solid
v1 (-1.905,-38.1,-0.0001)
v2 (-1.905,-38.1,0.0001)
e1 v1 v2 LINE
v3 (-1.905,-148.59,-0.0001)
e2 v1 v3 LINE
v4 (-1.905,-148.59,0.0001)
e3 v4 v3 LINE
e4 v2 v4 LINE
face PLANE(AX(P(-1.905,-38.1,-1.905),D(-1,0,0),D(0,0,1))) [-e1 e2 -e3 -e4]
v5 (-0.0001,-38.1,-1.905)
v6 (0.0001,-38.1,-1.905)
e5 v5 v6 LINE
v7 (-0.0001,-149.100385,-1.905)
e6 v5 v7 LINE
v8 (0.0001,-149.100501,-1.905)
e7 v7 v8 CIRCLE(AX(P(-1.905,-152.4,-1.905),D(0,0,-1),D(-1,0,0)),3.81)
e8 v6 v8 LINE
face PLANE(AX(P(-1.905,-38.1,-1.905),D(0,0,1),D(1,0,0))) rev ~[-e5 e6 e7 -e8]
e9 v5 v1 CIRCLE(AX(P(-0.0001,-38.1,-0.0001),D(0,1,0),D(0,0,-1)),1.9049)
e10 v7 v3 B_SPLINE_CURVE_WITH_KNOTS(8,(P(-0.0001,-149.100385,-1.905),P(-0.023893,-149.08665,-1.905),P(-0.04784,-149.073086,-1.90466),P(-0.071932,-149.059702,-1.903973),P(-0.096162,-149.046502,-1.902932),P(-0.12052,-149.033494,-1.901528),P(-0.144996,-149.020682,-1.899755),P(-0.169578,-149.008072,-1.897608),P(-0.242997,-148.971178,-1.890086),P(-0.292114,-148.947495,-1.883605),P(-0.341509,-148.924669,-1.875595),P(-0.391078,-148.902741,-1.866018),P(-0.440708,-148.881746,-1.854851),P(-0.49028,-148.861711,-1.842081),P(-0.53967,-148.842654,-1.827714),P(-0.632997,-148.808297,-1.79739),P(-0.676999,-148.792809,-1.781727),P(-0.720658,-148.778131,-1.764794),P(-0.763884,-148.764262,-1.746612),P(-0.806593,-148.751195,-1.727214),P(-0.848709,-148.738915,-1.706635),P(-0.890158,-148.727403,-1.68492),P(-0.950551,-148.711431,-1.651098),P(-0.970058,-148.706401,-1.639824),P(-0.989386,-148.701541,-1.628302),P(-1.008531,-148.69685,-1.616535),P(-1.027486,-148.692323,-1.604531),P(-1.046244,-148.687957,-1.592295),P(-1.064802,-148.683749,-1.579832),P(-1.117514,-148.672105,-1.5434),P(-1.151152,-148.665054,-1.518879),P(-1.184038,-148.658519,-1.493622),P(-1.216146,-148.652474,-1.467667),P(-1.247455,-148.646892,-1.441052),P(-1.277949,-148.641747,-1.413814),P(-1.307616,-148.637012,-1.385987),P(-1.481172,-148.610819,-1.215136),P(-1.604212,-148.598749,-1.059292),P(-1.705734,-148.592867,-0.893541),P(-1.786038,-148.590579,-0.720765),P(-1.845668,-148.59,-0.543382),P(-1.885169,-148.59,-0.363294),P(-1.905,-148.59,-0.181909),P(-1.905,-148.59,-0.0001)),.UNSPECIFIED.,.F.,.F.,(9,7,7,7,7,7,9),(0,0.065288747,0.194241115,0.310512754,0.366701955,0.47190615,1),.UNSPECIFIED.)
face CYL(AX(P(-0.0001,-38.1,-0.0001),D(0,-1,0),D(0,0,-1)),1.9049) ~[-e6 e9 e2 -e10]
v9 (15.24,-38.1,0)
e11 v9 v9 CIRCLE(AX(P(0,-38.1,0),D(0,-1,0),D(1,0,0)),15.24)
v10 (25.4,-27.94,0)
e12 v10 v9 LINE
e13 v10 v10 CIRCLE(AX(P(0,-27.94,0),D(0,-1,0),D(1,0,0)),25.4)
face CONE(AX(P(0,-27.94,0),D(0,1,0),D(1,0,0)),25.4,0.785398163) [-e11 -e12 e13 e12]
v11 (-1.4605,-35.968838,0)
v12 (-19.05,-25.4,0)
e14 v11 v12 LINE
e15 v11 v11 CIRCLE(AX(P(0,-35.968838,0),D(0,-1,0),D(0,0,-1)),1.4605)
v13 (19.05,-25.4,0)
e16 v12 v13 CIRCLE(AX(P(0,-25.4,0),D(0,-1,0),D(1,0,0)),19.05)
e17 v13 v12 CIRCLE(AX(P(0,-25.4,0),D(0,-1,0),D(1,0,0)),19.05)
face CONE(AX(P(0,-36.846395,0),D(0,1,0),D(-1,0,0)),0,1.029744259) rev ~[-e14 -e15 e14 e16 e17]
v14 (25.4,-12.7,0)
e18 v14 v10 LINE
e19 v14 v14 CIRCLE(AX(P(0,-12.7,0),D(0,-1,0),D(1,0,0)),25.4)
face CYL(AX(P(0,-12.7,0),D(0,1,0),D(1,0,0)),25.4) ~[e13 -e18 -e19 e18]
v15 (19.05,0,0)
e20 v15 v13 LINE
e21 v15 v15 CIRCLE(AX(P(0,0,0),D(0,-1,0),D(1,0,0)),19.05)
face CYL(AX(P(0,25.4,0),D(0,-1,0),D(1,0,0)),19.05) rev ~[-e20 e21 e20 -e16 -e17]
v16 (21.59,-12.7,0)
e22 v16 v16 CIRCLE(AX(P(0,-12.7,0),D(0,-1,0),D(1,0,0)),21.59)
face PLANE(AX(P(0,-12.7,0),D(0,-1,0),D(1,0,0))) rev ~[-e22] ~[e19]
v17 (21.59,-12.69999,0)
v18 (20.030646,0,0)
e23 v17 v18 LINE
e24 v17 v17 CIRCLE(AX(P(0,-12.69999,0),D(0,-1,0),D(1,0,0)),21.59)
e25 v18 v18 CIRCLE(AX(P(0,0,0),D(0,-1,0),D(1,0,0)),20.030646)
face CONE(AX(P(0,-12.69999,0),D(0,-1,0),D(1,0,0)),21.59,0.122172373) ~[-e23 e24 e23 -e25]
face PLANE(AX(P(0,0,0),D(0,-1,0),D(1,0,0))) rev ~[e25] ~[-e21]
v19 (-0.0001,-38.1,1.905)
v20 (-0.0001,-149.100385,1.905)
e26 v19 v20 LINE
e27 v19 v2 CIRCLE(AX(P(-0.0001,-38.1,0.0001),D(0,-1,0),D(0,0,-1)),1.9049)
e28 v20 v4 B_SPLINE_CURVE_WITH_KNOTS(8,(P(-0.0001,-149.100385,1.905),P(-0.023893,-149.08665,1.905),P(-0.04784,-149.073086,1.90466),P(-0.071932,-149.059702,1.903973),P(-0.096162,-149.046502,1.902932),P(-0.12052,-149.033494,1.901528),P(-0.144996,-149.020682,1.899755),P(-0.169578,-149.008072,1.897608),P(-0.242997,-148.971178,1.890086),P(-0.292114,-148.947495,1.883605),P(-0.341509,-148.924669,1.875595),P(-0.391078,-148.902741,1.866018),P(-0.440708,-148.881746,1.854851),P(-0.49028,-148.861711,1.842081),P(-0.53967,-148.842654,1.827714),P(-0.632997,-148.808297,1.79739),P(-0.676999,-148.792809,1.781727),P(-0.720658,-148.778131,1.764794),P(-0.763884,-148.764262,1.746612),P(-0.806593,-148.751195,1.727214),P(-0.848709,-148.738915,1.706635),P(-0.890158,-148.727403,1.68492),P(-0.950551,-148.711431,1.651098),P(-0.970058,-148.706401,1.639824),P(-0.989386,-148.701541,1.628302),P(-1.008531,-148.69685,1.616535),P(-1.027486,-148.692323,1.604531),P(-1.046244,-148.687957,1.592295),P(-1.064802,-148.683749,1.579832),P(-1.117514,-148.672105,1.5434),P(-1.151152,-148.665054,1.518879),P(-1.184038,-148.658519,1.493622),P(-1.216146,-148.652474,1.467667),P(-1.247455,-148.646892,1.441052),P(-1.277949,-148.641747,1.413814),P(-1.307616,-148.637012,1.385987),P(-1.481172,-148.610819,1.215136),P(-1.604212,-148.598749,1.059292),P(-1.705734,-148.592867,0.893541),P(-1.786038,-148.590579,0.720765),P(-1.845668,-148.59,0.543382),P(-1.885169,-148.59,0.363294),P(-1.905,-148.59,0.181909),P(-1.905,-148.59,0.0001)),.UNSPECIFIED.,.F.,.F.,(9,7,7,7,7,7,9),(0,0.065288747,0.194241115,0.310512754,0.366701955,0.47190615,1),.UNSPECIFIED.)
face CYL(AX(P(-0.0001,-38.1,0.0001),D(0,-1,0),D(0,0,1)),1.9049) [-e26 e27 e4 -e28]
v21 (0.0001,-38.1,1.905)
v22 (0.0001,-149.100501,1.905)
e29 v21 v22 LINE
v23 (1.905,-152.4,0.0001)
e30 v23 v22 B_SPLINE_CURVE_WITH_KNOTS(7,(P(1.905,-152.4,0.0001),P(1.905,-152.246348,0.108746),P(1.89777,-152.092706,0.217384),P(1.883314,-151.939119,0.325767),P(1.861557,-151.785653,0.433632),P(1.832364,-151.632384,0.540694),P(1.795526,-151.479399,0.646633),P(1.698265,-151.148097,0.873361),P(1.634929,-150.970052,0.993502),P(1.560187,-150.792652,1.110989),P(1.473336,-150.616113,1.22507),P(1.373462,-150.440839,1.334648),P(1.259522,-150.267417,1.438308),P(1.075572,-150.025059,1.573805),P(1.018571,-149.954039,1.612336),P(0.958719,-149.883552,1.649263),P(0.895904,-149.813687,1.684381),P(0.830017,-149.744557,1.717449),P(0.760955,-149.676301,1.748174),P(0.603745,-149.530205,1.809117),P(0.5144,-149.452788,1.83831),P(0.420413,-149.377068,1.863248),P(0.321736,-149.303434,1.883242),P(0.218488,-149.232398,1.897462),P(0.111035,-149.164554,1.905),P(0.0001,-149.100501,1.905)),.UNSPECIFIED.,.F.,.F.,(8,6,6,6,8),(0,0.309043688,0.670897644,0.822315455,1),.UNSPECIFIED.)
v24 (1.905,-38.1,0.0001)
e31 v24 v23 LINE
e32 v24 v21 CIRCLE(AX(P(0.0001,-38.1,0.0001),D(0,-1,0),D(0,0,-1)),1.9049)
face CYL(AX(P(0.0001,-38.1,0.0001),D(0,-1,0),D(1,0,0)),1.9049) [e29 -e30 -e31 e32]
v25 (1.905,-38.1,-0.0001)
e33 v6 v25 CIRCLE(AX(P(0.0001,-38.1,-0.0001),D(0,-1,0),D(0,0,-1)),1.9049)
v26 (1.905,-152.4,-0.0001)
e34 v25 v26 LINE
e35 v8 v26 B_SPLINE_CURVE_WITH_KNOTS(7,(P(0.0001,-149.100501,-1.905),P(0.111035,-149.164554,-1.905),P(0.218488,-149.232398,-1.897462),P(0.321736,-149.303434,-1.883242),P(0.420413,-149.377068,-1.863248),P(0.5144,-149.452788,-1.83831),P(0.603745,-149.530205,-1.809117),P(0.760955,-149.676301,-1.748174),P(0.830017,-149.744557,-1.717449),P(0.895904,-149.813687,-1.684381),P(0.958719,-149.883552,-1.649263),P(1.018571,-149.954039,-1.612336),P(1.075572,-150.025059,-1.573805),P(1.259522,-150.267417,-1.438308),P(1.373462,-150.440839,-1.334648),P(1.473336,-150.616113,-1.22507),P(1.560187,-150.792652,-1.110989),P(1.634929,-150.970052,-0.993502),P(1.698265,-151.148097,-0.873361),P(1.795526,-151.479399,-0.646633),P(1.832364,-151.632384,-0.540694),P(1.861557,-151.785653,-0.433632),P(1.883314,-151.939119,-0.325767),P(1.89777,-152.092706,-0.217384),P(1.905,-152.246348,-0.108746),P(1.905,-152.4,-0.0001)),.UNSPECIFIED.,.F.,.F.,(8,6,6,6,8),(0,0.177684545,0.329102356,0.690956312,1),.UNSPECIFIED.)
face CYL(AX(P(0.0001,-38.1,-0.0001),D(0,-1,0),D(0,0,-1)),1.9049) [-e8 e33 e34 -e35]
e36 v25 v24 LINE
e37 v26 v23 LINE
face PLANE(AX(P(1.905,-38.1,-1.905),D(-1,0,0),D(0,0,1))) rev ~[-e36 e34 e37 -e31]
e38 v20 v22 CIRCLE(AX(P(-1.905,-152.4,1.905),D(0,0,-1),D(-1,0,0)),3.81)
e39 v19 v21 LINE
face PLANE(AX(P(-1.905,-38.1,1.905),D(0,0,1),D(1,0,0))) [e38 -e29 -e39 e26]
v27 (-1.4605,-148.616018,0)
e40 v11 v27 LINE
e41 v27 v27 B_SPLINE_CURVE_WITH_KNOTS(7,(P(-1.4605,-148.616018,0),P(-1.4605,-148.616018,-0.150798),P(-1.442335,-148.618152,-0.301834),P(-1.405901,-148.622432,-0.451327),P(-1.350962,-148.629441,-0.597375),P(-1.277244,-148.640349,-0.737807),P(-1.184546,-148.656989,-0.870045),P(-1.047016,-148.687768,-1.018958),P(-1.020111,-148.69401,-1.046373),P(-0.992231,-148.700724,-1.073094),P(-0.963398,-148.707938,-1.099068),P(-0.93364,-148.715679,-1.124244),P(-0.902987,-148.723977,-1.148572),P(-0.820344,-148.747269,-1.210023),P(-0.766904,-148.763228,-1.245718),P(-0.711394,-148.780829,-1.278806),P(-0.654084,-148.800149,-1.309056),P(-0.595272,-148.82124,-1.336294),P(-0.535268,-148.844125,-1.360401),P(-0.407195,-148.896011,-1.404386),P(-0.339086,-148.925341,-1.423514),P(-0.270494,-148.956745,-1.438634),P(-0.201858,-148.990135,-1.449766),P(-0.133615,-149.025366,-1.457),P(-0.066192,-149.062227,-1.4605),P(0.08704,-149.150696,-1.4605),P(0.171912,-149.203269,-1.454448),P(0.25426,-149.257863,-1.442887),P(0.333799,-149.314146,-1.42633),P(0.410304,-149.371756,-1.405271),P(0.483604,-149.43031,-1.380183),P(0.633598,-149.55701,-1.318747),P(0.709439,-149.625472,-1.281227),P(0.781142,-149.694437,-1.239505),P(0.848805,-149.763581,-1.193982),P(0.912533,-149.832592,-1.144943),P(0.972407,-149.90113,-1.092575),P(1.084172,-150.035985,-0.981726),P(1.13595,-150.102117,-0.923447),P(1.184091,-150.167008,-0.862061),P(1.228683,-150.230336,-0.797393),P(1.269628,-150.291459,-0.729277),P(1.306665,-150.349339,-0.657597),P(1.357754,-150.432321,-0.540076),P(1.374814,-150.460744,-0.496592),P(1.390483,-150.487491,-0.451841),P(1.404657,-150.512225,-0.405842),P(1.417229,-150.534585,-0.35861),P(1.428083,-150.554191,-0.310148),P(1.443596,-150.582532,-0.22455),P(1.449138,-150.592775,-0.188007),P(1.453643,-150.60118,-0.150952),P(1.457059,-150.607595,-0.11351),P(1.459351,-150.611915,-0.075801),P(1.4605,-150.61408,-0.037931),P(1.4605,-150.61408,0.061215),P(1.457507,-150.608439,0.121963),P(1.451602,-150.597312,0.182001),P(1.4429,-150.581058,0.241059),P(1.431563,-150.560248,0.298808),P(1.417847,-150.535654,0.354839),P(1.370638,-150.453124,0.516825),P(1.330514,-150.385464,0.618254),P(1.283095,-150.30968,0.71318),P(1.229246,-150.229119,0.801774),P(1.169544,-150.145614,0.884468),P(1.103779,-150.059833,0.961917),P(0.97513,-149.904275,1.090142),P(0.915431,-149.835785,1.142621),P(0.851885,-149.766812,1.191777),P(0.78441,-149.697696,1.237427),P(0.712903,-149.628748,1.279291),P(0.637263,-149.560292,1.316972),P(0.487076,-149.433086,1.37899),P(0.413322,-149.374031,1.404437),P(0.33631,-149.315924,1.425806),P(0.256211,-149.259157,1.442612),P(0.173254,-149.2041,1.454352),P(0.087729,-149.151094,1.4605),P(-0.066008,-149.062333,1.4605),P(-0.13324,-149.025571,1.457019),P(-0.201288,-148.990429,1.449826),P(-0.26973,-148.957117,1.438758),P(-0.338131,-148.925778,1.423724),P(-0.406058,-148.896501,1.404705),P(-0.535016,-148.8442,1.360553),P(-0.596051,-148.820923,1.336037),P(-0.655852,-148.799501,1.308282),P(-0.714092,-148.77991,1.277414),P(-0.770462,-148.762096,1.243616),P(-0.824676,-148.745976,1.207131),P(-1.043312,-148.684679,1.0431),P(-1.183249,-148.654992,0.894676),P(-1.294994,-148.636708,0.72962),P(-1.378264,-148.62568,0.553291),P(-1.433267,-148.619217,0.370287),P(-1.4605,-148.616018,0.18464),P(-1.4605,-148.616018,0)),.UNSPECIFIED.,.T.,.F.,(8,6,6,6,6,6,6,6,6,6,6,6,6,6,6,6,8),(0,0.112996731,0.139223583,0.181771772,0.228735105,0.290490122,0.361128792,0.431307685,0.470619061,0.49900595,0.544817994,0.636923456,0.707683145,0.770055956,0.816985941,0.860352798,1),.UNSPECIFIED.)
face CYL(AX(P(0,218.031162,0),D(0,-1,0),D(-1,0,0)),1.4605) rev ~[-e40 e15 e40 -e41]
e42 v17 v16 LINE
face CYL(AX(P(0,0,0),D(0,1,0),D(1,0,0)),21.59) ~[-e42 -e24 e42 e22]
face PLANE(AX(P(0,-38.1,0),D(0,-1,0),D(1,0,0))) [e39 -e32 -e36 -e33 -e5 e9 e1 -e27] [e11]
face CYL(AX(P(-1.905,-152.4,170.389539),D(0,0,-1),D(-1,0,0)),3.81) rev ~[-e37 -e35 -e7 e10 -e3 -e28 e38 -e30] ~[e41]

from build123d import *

# Parameters (mm, degrees)
F0_R      = 21.59
F1_DEPTH  = 12.7
F2_R      = 25.4
F3_DEPTH  = 25.4
F4_SIZE   = 10.16
F5_W      = 3.81
F5_H      = 3.81
F6_DEPTH  = 114.3
F8_D      = 7.62
F9_R      = 1.9049
F11_D     = 38.1
F11_DEPTH = 25.4
F11_TIP   = 11.4463947925
F13_D     = 2.921
F13_DEPTH = 254
F13_START = 35.9688379
F13_TIP   = 0.8775569341
F14_SIZE2 = 1.559354
F14_SIZE  = 12.69999


# Not quite as in the source:
# - a fillet or chamfer is up to 0.001 mm smaller than in the source, because OpenCascade refuses the exact size


with BuildPart() as f1:
    # F0 (on Front) → F1 (new body)
    with BuildSketch(Plane.XZ):
        Circle(F0_R)
    extrude(amount=F1_DEPTH)

    # F2 (on face) → F3 (join)
    with BuildSketch(Plane.XZ.offset(12.7)):
        Circle(F2_R)
    extrude(amount=F3_DEPTH)

    # F4
    f4_edges = [f1.edges().sort_by_distance(p)[0] for p in [
        (-25.4, -38.1, 0),
    ]]
    chamfer(f4_edges, length=F4_SIZE)

    # F5 (on face) → F6 (join)
    with BuildSketch(Plane.XZ.offset(38.1)):
        Rectangle(F5_W, F5_H)
    extrude(amount=F6_DEPTH)

    # F8 (through all)
    with Locations(Plane.XY.offset(1.905)):
        with Locations((-1.905, -152.4)):
            Hole(F8_D / 2)

    # F9 (radius 1.905 in the source; OpenCascade refuses exactly that, so slightly less here)
    f9_edges = [f1.edges().sort_by_distance(p)[0] for p in [
        (1.905, -95.25, -1.905),
        (1.905, -95.25, 1.905),
        (-1.905, -93.345, 1.905),
        (-1.905, -93.345, -1.905),
    ]]
    fillet(f9_edges, radius=F9_R)

    # F11
    with Locations(Plane(origin=(0, 0, 0), x_dir=(-1, 0, 0), z_dir=(0, 1, 0))):
        with Locations((0, 0)):
            Hole(F11_D / 2, depth=F11_DEPTH)
            with Locations((0, 0, -(F11_DEPTH + F11_TIP / 2))):  # 118° drill point
                Cone(0, F11_D / 2, F11_TIP, mode=Mode.SUBTRACT)

    # F13
    # its depths count from where the whole tool has entered the part; down to there all is cleared
    with Locations(Plane(origin=(0, 0, 0), x_dir=(1, 0, 0), z_dir=(0, 1, 0)).offset(-F13_START)):
        with Locations((0, 0)):
            Hole(F13_D / 2, depth=F13_DEPTH)
            with Locations((0, 0, -(F13_DEPTH + F13_TIP / 2))):  # 118° drill point
                Cone(0, F13_D / 2, F13_TIP, mode=Mode.SUBTRACT)

    # F14 (size 12.7 and 1.5593639235 in the source; OpenCascade refuses exactly that, so slightly less here)
    f14_edges = [f1.edges().sort_by_distance(p)[0] for p in [
        (-21.59, 0, 0),
    ]]
    f14_side = f1.faces().sort_by_distance((-21.59, -6.35, 0))[0]
    chamfer(f14_edges, length=F14_SIZE, length2=F14_SIZE2, reference=f14_side)


solid = f1.part
